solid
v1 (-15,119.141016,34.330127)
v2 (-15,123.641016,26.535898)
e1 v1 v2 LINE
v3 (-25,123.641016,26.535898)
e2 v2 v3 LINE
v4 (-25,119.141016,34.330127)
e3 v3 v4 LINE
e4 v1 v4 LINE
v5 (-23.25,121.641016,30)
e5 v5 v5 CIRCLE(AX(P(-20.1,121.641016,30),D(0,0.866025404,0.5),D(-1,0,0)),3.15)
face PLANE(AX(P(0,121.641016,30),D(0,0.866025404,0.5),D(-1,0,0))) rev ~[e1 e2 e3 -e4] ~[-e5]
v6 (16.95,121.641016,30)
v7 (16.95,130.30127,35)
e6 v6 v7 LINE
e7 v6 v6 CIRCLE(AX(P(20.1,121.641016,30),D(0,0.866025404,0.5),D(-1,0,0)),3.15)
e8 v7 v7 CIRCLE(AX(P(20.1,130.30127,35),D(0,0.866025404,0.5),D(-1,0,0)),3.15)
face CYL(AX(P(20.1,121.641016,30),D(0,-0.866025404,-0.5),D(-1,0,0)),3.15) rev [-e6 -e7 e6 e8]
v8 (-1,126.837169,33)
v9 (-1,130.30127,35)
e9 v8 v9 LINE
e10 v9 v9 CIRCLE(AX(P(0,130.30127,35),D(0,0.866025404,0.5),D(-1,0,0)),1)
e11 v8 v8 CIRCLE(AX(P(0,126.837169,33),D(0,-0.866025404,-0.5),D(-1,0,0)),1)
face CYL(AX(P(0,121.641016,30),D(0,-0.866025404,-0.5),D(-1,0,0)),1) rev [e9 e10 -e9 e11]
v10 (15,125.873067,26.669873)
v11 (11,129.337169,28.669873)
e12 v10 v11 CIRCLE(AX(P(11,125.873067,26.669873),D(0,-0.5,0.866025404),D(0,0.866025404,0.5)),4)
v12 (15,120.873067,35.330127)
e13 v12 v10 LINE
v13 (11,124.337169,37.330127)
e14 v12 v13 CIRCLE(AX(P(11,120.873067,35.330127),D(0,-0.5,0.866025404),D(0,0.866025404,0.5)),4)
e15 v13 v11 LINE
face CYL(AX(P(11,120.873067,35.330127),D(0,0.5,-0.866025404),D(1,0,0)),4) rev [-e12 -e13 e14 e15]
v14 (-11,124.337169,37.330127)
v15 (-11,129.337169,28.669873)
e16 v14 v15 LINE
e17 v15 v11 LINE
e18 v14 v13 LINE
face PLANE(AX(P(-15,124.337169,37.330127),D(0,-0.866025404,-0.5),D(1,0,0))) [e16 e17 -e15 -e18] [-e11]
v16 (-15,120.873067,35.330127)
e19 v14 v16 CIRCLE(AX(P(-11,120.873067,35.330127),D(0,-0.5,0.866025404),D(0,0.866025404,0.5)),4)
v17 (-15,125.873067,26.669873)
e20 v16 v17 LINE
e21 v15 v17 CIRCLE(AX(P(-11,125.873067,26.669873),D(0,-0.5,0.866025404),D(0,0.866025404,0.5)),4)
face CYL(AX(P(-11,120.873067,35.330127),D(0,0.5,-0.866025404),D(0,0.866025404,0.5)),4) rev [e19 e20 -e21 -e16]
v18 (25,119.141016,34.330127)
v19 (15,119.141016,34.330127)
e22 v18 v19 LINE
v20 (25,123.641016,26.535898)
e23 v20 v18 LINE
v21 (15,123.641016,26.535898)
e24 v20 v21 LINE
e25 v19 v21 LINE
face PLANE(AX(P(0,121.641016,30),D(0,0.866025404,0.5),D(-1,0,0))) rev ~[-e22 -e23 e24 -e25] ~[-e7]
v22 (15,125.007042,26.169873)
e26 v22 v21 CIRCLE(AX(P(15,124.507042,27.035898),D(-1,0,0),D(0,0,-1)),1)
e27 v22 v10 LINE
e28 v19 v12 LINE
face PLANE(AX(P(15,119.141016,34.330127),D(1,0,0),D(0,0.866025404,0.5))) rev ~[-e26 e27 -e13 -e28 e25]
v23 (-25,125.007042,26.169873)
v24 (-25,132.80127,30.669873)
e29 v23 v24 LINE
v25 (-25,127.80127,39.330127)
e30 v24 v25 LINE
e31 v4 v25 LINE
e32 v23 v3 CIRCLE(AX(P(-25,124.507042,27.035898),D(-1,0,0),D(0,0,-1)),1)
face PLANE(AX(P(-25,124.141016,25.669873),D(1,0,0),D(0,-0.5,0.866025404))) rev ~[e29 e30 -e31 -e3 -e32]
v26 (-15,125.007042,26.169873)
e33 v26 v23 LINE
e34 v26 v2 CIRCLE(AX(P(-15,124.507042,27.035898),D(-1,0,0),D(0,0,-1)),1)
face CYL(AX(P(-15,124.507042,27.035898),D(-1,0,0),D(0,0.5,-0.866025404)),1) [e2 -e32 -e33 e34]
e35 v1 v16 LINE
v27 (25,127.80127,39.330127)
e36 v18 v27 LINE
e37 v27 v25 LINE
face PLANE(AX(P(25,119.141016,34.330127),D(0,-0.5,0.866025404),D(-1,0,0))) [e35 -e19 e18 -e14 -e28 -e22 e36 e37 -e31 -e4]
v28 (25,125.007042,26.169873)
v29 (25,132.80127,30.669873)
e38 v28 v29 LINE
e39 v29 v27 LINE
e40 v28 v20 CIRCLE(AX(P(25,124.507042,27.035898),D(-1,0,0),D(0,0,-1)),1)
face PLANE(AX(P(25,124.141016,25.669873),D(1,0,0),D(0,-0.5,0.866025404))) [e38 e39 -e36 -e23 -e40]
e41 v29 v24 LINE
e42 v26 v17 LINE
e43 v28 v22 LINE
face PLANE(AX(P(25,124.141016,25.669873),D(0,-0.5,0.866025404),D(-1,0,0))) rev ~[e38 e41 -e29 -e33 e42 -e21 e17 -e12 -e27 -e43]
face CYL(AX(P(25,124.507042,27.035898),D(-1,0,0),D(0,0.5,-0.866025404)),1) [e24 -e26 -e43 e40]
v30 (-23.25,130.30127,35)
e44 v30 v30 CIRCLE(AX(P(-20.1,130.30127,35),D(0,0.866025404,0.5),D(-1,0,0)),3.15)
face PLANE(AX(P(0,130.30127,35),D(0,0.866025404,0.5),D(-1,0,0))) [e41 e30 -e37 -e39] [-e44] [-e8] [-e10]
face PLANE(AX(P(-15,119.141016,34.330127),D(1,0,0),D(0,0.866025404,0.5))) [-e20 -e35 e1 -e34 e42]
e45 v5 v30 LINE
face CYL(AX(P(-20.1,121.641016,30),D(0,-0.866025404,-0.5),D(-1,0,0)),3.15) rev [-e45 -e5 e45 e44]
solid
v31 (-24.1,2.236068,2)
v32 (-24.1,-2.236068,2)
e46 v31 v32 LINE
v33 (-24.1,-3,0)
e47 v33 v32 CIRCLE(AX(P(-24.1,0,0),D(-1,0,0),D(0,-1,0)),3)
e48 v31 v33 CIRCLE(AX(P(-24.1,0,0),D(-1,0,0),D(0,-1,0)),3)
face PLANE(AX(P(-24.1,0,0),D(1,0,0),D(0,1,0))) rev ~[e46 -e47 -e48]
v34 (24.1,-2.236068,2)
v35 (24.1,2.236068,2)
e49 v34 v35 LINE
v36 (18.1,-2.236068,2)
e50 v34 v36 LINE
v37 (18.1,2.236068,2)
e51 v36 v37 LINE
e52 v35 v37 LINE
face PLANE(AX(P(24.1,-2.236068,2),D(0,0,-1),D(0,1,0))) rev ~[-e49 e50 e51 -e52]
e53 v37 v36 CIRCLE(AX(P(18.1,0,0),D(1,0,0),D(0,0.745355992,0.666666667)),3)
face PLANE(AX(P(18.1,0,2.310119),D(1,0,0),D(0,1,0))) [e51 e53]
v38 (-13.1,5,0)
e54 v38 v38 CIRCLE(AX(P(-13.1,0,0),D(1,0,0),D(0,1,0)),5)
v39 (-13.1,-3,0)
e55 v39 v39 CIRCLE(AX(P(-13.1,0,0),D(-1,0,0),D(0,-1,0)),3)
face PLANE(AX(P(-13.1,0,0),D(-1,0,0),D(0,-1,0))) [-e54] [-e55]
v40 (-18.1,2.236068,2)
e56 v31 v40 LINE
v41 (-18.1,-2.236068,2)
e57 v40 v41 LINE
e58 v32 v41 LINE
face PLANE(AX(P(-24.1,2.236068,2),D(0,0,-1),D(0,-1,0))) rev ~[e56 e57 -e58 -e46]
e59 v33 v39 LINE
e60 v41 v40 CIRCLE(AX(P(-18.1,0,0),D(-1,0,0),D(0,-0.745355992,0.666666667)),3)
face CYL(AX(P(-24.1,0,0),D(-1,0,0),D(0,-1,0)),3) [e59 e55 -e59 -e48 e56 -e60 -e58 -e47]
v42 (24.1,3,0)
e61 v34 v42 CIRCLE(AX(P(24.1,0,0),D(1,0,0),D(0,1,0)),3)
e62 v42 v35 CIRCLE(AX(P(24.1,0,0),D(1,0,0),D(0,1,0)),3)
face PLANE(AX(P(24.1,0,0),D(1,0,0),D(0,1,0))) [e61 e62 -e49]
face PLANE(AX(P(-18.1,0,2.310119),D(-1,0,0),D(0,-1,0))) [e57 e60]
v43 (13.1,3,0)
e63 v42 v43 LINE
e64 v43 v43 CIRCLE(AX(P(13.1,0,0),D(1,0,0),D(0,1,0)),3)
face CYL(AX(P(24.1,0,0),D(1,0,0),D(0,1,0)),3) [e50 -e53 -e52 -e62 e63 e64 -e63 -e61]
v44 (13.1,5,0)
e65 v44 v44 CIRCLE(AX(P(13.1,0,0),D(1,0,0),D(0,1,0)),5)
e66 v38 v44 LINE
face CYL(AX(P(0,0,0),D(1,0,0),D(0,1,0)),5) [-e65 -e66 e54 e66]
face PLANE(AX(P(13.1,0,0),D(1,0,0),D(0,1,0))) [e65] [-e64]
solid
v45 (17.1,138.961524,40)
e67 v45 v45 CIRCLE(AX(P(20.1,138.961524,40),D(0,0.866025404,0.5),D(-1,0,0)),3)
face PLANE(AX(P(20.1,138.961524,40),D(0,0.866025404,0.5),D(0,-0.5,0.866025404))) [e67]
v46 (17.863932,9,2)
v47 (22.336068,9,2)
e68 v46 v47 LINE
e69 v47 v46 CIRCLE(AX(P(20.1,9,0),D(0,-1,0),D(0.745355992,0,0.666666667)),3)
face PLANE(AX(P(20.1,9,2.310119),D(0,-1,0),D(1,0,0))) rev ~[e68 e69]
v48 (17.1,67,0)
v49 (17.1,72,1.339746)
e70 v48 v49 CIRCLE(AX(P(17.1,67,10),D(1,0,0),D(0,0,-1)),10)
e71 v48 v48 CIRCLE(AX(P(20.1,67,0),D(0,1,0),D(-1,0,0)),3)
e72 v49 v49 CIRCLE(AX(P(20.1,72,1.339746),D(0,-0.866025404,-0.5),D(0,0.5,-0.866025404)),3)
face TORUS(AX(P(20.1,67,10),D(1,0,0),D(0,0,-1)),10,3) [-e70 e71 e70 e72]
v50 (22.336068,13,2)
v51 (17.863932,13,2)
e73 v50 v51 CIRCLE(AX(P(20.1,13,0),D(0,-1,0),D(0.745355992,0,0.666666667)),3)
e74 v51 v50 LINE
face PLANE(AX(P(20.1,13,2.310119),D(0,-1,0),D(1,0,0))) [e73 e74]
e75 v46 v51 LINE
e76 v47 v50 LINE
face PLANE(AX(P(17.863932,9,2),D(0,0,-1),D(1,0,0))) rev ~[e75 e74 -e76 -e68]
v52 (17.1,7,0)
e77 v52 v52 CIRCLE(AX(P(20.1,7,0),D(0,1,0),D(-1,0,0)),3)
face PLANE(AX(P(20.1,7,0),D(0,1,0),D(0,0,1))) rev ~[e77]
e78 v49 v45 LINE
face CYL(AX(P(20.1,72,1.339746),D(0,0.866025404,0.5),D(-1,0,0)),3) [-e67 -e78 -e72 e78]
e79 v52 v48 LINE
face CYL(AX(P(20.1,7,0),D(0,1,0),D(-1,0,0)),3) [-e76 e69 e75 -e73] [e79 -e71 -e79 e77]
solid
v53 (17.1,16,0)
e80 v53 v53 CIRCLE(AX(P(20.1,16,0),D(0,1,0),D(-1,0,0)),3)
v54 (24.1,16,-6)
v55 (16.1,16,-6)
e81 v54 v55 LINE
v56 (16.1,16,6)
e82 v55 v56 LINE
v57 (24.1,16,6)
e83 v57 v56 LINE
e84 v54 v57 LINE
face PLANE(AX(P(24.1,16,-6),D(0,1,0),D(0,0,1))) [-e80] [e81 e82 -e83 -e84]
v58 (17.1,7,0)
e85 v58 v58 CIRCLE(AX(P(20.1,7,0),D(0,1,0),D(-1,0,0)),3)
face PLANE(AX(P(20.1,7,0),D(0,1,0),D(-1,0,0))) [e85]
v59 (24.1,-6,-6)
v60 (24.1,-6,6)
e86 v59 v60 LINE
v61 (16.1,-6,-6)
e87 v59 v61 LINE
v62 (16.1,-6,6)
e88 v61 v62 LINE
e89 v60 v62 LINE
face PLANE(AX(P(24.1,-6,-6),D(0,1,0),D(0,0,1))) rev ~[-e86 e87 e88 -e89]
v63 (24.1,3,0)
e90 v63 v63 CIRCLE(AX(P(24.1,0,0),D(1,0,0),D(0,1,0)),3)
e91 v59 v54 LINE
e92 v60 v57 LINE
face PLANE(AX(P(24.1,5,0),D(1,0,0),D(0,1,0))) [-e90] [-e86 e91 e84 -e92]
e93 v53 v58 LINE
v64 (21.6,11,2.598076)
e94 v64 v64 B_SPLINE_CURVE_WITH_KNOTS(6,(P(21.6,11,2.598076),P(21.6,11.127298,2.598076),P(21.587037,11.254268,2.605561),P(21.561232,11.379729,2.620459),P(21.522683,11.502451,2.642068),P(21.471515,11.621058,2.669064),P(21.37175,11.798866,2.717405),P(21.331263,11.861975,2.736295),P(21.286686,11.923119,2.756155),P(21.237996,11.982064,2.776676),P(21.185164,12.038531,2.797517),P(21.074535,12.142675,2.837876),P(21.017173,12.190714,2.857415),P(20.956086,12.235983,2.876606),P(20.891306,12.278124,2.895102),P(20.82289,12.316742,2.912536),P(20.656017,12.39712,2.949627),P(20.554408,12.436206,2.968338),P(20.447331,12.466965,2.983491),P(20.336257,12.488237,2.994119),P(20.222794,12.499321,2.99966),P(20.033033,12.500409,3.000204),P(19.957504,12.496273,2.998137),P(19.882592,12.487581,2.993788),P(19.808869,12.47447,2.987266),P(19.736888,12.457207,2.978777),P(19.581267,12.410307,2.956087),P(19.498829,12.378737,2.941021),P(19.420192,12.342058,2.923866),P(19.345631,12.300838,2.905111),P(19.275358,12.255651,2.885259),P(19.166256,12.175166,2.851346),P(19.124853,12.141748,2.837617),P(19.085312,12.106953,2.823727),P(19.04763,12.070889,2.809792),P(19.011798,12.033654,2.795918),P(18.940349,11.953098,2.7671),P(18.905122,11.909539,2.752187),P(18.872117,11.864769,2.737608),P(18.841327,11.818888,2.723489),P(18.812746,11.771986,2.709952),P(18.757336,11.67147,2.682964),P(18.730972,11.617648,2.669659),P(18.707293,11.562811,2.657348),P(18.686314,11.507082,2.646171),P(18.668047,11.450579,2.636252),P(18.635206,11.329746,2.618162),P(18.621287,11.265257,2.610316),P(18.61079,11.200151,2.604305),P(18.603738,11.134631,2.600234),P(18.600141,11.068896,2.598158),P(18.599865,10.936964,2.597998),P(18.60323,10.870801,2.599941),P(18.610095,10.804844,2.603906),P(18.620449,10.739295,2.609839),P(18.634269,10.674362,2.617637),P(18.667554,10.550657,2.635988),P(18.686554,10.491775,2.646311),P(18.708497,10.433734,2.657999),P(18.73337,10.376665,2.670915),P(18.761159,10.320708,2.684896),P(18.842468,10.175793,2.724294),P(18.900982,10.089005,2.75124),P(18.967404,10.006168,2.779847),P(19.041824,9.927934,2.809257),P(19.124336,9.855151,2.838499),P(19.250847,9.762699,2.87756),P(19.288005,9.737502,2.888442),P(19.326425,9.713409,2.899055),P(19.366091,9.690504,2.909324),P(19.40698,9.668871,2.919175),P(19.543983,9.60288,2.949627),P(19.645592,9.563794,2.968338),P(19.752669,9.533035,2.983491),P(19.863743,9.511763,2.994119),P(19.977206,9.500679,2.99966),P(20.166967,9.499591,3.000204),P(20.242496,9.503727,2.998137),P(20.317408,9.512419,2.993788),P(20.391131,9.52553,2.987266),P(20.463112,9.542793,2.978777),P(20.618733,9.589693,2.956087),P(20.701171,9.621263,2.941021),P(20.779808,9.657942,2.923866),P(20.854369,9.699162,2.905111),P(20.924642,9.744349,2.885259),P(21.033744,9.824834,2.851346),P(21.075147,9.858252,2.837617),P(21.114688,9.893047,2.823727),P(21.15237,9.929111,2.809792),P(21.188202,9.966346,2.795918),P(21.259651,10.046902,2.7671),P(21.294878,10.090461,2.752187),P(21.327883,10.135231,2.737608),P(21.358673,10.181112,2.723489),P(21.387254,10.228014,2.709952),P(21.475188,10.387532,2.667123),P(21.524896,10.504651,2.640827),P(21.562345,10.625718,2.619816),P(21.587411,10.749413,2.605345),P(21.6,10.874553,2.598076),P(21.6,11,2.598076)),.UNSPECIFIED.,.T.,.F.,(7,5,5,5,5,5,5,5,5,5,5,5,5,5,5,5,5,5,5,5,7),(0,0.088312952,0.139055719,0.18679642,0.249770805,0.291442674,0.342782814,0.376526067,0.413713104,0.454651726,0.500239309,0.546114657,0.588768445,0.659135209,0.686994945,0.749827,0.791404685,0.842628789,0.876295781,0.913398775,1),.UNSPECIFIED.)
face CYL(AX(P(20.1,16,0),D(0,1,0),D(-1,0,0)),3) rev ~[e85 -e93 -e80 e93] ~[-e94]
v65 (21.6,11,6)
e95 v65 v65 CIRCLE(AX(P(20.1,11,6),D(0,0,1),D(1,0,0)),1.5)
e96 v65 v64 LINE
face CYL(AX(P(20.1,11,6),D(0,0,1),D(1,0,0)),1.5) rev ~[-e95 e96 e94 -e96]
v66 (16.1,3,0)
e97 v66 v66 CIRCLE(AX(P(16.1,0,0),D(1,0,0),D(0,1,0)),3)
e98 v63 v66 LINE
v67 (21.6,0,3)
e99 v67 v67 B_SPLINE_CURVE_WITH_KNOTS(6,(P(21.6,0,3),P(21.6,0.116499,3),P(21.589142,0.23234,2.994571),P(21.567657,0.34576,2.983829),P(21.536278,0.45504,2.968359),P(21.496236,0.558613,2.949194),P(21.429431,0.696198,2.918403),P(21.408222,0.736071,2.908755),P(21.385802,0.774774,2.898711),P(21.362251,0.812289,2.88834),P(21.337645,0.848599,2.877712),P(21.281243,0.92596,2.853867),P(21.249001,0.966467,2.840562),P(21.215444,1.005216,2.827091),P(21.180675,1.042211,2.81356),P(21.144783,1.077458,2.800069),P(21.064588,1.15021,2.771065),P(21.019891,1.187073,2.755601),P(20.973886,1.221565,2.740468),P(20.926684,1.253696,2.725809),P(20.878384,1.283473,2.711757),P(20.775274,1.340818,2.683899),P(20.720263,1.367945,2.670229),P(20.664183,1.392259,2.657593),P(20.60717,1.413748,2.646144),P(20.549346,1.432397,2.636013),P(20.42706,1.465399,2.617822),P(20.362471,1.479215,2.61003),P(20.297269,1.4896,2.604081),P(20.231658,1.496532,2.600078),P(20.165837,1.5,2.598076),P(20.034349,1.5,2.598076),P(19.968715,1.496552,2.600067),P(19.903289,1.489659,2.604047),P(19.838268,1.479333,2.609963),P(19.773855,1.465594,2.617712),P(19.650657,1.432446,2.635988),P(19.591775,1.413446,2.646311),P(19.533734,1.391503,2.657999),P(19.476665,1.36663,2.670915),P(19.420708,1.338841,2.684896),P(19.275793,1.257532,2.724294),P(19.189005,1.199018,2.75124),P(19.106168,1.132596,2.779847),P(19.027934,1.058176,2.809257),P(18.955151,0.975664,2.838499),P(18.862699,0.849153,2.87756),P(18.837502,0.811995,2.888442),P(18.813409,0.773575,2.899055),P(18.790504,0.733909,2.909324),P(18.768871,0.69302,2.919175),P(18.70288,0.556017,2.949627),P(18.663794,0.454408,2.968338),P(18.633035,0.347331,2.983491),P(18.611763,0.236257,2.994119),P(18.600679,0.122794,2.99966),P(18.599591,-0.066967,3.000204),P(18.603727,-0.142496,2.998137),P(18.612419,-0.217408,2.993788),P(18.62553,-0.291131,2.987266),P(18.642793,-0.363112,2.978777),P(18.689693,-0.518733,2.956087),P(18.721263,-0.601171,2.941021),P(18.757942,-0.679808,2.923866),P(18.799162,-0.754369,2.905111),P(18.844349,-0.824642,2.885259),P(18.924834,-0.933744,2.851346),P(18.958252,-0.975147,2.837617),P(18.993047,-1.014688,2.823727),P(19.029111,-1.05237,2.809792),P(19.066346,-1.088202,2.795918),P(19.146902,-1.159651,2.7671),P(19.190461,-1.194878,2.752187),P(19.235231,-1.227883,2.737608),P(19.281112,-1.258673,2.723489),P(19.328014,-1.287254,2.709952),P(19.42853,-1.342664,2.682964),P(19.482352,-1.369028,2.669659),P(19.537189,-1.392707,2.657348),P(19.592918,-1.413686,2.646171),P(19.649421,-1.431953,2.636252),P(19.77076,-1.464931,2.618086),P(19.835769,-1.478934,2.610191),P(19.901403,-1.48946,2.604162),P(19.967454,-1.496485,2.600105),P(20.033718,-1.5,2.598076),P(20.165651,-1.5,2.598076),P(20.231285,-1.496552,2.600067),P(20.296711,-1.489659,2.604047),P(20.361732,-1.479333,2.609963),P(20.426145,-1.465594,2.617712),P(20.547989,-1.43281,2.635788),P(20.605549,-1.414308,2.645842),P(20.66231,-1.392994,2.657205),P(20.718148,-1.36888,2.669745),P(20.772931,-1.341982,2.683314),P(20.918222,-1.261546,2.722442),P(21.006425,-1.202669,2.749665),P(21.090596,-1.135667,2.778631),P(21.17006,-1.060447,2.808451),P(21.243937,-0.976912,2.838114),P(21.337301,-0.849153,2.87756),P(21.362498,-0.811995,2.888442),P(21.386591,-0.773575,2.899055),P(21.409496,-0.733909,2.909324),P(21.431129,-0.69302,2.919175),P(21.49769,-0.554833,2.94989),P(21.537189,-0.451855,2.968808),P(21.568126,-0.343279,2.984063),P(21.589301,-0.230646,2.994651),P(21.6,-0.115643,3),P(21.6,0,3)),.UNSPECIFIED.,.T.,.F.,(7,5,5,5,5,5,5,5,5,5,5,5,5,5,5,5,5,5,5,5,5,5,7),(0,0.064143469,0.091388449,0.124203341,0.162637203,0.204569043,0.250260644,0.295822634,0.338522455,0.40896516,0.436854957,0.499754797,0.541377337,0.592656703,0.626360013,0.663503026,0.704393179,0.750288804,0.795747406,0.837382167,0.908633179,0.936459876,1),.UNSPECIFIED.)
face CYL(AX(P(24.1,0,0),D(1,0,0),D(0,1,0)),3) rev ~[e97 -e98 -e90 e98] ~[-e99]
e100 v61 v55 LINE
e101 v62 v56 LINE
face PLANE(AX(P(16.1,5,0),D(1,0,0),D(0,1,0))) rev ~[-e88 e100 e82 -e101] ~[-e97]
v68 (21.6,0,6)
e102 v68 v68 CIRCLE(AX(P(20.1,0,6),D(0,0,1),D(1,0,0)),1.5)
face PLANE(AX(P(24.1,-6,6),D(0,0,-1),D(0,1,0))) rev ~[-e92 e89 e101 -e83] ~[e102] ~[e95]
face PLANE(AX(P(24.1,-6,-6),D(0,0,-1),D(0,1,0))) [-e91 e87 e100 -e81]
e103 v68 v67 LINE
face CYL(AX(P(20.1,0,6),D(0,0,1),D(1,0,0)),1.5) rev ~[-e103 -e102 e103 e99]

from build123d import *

# Parameters (mm, degrees)
F0_R      = 5
F1_DEPTH  = 24.1
F2_R      = 5
F2_R_2    = 3
F3_DEPTH  = 11
F4_R      = 5
F4_R_2    = 3
F5_DEPTH  = 11
F7_DEPTH  = 6
F9_DEPTH  = 6
F10_W     = 22
F10_H     = 12
F11_DEPTH = 8
F12_R     = 3
F13_DEPTH = 48.201
F14_R     = 3
F15_DEPTH = 9
F16_R     = 1.5
F17_REACH = 16.2436406871
F18_R     = 1.5
F19_REACH = 16.2436406871
F20_R     = 3
F25_DEPTH = 4
F27_W     = 50
F27_H     = 10
F27_R     = 3.15
F27_R_2   = 1
F28_DEPTH = 10
F29_W     = 30
F29_H     = 6
F30_DEPTH = 45.5881685741
F31_R     = 4
F32_R     = 1


with BuildPart() as f1:
    # F0 (on Right) → F1 (new body, symmetric)
    with BuildSketch(Plane.YZ):
        Circle(F0_R)
    extrude(amount=F1_DEPTH, both=True)

    # F2 (on face) → F3 (cut)
    with BuildSketch(Plane.YZ.offset(24.1)):
        Circle(F2_R)
        Circle(F2_R_2, mode=Mode.SUBTRACT)
    extrude(amount=-F3_DEPTH, mode=Mode.SUBTRACT)

    # F4 (on face) → F5 (cut)
    with BuildSketch(Plane(origin=(-24.1, 0, 0), x_dir=(0, -1, 0), z_dir=(-1, 0, 0))):
        Circle(F4_R)
        Circle(F4_R_2, mode=Mode.SUBTRACT)
    extrude(amount=-F5_DEPTH, mode=Mode.SUBTRACT)

    # F6 (on face) → F7 (cut)
    with BuildSketch(Plane.YZ.offset(24.1)):
        with BuildLine():
            ThreePointArc((2.2360679775, 2), (0, 3), (-2.2360679775, 2))
            Line((-2.2360679775, 2), (2.2360679775, 2))
        make_face()
    extrude(amount=-F7_DEPTH, mode=Mode.SUBTRACT)

    # F8 (on face) → F9 (cut)
    with BuildSketch(Plane(origin=(-24.1, 0, 0), x_dir=(0, -1, 0), z_dir=(-1, 0, 0))):
        with BuildLine():
            Line((-2.2360679775, 2), (2.2360679775, 2))
            ThreePointArc((2.2360679775, 2), (0, 3), (-2.2360679775, 2))
        make_face()
    extrude(amount=-F9_DEPTH, mode=Mode.SUBTRACT)


with BuildPart() as f11:
    # F10 (on face) → F11 (new body)
    with BuildSketch(Plane.YZ.offset(24.1)):
        with Locations((5, 0)):
            Rectangle(F10_W, F10_H)
    extrude(amount=-F11_DEPTH)

    # F12 (on face) → F13 (cut, through all)
    with BuildSketch(Plane.YZ.offset(24.1)):
        Circle(F12_R)
    extrude(amount=-F13_DEPTH, mode=Mode.SUBTRACT)

    # F14 (on face) → F15 (cut)
    with BuildSketch(Plane(origin=(0, 16, 0), x_dir=(-1, 0, 0), z_dir=(0, 1, 0))):
        with Locations((-20.1, 0)):
            Circle(F14_R)
    extrude(amount=-F15_DEPTH, mode=Mode.SUBTRACT)

    f17_end = f11.faces().sort_by_distance((20.1, -3, 0))[0]
    # F16 (on face) → F17 (cut, up to a face of the model that its end follows)
    with BuildSketch(Plane.XY.offset(6)):
        with Locations((20.1, 0)):
            Circle(F16_R)
    f17_long = extrude(amount=-F17_REACH, mode=Mode.PRIVATE)
    add(split(f17_long, bisect_by=f17_end, keep=Keep.ALL, mode=Mode.PRIVATE).solids().sort_by_distance((20.1, 0, 6))[0], mode=Mode.SUBTRACT)

    f19_end = f11.faces().sort_by_distance((23.1, 11.5, 0))[0]
    # F18 (on face) → F19 (cut, up to a face of the model that its end follows)
    with BuildSketch(Plane.XY.offset(6)):
        with Locations((20.1, 11)):
            Circle(F18_R)
    f19_long = extrude(amount=-F19_REACH, mode=Mode.PRIVATE)
    add(split(f19_long, bisect_by=f19_end, keep=Keep.ALL, mode=Mode.PRIVATE).solids().sort_by_distance((20.1, 11, 6))[0], mode=Mode.SUBTRACT)


with BuildPart() as f22:
    # F22: sweep along a path in F21
    with BuildLine(Plane.YZ) as f22_path:
        Line((7, 0), (67, 0))
        ThreePointArc((67, 0), (69.588190451, 0.3407417371), (72, 1.3397459622))
        Line((72, 1.3397459622), (138.9615242271, 40))
    # F20 (on face) → F22 (sweep)
    with BuildSketch(Plane(origin=(0, 7, 0), x_dir=(-1, 0, 0), z_dir=(0, 1, 0))):
        with Locations((-20.1, 0)):
            Circle(F20_R)
    sweep(path=f22_path.line)

    # F24 (on offset) → F25 (cut)
    with BuildSketch(Plane.XZ.offset(-9)):
        with BuildLine():
            Line((17.8639320225, 2), (22.3360679775, 2))
            ThreePointArc((22.3360679775, 2), (20.1, 3), (17.8639320225, 2))
        make_face()
    extrude(amount=-F25_DEPTH, mode=Mode.SUBTRACT)


with BuildPart() as f28:
    # F27 (on offset) → F28 (new body)
    with BuildSketch(Plane(origin=(0, 104.2211431703, 60.1721050646), x_dir=(-1, 0, 0), z_dir=(0, 0.8660254038, 0.5))):
        with Locations((0, -34.8397459622)):
            Rectangle(F27_W, F27_H)
        with Locations((-20.1, -34.8397459622)):
            Circle(F27_R, mode=Mode.SUBTRACT)
        with Locations((0, -34.8397459622)):
            Circle(F27_R_2, mode=Mode.SUBTRACT)
        with Locations((20.1, -34.8397459622)):
            Circle(F27_R, mode=Mode.SUBTRACT)
    extrude(amount=F28_DEPTH)

    # F29 (on face) → F30 (cut, through all)
    with BuildSketch(Plane(origin=(0, 14.9198729811, -25.8419780457), x_dir=(1, 0, 0), z_dir=(0, -0.5, 0.8660254038))):
        with Locations((0, 123.3442101292)):
            Rectangle(F29_W, F29_H)
    extrude(amount=-F30_DEPTH, mode=Mode.SUBTRACT)

    # F31
    f31_edges = [f28.edges().sort_by_distance(p)[0] for p in [
        (-15, 126.837169, 33),
        (15, 126.837169, 33),
    ]]
    fillet(f31_edges, radius=F31_R)

    # F32
    f32_edges = [f28.edges().sort_by_distance(p)[0] for p in [
        (20, 124.141016, 25.669873),
        (-20, 124.141016, 25.669873),
    ]]
    fillet(f32_edges, radius=F32_R)


solid = Compound([f1.part, f11.part, f22.part, f28.part])
